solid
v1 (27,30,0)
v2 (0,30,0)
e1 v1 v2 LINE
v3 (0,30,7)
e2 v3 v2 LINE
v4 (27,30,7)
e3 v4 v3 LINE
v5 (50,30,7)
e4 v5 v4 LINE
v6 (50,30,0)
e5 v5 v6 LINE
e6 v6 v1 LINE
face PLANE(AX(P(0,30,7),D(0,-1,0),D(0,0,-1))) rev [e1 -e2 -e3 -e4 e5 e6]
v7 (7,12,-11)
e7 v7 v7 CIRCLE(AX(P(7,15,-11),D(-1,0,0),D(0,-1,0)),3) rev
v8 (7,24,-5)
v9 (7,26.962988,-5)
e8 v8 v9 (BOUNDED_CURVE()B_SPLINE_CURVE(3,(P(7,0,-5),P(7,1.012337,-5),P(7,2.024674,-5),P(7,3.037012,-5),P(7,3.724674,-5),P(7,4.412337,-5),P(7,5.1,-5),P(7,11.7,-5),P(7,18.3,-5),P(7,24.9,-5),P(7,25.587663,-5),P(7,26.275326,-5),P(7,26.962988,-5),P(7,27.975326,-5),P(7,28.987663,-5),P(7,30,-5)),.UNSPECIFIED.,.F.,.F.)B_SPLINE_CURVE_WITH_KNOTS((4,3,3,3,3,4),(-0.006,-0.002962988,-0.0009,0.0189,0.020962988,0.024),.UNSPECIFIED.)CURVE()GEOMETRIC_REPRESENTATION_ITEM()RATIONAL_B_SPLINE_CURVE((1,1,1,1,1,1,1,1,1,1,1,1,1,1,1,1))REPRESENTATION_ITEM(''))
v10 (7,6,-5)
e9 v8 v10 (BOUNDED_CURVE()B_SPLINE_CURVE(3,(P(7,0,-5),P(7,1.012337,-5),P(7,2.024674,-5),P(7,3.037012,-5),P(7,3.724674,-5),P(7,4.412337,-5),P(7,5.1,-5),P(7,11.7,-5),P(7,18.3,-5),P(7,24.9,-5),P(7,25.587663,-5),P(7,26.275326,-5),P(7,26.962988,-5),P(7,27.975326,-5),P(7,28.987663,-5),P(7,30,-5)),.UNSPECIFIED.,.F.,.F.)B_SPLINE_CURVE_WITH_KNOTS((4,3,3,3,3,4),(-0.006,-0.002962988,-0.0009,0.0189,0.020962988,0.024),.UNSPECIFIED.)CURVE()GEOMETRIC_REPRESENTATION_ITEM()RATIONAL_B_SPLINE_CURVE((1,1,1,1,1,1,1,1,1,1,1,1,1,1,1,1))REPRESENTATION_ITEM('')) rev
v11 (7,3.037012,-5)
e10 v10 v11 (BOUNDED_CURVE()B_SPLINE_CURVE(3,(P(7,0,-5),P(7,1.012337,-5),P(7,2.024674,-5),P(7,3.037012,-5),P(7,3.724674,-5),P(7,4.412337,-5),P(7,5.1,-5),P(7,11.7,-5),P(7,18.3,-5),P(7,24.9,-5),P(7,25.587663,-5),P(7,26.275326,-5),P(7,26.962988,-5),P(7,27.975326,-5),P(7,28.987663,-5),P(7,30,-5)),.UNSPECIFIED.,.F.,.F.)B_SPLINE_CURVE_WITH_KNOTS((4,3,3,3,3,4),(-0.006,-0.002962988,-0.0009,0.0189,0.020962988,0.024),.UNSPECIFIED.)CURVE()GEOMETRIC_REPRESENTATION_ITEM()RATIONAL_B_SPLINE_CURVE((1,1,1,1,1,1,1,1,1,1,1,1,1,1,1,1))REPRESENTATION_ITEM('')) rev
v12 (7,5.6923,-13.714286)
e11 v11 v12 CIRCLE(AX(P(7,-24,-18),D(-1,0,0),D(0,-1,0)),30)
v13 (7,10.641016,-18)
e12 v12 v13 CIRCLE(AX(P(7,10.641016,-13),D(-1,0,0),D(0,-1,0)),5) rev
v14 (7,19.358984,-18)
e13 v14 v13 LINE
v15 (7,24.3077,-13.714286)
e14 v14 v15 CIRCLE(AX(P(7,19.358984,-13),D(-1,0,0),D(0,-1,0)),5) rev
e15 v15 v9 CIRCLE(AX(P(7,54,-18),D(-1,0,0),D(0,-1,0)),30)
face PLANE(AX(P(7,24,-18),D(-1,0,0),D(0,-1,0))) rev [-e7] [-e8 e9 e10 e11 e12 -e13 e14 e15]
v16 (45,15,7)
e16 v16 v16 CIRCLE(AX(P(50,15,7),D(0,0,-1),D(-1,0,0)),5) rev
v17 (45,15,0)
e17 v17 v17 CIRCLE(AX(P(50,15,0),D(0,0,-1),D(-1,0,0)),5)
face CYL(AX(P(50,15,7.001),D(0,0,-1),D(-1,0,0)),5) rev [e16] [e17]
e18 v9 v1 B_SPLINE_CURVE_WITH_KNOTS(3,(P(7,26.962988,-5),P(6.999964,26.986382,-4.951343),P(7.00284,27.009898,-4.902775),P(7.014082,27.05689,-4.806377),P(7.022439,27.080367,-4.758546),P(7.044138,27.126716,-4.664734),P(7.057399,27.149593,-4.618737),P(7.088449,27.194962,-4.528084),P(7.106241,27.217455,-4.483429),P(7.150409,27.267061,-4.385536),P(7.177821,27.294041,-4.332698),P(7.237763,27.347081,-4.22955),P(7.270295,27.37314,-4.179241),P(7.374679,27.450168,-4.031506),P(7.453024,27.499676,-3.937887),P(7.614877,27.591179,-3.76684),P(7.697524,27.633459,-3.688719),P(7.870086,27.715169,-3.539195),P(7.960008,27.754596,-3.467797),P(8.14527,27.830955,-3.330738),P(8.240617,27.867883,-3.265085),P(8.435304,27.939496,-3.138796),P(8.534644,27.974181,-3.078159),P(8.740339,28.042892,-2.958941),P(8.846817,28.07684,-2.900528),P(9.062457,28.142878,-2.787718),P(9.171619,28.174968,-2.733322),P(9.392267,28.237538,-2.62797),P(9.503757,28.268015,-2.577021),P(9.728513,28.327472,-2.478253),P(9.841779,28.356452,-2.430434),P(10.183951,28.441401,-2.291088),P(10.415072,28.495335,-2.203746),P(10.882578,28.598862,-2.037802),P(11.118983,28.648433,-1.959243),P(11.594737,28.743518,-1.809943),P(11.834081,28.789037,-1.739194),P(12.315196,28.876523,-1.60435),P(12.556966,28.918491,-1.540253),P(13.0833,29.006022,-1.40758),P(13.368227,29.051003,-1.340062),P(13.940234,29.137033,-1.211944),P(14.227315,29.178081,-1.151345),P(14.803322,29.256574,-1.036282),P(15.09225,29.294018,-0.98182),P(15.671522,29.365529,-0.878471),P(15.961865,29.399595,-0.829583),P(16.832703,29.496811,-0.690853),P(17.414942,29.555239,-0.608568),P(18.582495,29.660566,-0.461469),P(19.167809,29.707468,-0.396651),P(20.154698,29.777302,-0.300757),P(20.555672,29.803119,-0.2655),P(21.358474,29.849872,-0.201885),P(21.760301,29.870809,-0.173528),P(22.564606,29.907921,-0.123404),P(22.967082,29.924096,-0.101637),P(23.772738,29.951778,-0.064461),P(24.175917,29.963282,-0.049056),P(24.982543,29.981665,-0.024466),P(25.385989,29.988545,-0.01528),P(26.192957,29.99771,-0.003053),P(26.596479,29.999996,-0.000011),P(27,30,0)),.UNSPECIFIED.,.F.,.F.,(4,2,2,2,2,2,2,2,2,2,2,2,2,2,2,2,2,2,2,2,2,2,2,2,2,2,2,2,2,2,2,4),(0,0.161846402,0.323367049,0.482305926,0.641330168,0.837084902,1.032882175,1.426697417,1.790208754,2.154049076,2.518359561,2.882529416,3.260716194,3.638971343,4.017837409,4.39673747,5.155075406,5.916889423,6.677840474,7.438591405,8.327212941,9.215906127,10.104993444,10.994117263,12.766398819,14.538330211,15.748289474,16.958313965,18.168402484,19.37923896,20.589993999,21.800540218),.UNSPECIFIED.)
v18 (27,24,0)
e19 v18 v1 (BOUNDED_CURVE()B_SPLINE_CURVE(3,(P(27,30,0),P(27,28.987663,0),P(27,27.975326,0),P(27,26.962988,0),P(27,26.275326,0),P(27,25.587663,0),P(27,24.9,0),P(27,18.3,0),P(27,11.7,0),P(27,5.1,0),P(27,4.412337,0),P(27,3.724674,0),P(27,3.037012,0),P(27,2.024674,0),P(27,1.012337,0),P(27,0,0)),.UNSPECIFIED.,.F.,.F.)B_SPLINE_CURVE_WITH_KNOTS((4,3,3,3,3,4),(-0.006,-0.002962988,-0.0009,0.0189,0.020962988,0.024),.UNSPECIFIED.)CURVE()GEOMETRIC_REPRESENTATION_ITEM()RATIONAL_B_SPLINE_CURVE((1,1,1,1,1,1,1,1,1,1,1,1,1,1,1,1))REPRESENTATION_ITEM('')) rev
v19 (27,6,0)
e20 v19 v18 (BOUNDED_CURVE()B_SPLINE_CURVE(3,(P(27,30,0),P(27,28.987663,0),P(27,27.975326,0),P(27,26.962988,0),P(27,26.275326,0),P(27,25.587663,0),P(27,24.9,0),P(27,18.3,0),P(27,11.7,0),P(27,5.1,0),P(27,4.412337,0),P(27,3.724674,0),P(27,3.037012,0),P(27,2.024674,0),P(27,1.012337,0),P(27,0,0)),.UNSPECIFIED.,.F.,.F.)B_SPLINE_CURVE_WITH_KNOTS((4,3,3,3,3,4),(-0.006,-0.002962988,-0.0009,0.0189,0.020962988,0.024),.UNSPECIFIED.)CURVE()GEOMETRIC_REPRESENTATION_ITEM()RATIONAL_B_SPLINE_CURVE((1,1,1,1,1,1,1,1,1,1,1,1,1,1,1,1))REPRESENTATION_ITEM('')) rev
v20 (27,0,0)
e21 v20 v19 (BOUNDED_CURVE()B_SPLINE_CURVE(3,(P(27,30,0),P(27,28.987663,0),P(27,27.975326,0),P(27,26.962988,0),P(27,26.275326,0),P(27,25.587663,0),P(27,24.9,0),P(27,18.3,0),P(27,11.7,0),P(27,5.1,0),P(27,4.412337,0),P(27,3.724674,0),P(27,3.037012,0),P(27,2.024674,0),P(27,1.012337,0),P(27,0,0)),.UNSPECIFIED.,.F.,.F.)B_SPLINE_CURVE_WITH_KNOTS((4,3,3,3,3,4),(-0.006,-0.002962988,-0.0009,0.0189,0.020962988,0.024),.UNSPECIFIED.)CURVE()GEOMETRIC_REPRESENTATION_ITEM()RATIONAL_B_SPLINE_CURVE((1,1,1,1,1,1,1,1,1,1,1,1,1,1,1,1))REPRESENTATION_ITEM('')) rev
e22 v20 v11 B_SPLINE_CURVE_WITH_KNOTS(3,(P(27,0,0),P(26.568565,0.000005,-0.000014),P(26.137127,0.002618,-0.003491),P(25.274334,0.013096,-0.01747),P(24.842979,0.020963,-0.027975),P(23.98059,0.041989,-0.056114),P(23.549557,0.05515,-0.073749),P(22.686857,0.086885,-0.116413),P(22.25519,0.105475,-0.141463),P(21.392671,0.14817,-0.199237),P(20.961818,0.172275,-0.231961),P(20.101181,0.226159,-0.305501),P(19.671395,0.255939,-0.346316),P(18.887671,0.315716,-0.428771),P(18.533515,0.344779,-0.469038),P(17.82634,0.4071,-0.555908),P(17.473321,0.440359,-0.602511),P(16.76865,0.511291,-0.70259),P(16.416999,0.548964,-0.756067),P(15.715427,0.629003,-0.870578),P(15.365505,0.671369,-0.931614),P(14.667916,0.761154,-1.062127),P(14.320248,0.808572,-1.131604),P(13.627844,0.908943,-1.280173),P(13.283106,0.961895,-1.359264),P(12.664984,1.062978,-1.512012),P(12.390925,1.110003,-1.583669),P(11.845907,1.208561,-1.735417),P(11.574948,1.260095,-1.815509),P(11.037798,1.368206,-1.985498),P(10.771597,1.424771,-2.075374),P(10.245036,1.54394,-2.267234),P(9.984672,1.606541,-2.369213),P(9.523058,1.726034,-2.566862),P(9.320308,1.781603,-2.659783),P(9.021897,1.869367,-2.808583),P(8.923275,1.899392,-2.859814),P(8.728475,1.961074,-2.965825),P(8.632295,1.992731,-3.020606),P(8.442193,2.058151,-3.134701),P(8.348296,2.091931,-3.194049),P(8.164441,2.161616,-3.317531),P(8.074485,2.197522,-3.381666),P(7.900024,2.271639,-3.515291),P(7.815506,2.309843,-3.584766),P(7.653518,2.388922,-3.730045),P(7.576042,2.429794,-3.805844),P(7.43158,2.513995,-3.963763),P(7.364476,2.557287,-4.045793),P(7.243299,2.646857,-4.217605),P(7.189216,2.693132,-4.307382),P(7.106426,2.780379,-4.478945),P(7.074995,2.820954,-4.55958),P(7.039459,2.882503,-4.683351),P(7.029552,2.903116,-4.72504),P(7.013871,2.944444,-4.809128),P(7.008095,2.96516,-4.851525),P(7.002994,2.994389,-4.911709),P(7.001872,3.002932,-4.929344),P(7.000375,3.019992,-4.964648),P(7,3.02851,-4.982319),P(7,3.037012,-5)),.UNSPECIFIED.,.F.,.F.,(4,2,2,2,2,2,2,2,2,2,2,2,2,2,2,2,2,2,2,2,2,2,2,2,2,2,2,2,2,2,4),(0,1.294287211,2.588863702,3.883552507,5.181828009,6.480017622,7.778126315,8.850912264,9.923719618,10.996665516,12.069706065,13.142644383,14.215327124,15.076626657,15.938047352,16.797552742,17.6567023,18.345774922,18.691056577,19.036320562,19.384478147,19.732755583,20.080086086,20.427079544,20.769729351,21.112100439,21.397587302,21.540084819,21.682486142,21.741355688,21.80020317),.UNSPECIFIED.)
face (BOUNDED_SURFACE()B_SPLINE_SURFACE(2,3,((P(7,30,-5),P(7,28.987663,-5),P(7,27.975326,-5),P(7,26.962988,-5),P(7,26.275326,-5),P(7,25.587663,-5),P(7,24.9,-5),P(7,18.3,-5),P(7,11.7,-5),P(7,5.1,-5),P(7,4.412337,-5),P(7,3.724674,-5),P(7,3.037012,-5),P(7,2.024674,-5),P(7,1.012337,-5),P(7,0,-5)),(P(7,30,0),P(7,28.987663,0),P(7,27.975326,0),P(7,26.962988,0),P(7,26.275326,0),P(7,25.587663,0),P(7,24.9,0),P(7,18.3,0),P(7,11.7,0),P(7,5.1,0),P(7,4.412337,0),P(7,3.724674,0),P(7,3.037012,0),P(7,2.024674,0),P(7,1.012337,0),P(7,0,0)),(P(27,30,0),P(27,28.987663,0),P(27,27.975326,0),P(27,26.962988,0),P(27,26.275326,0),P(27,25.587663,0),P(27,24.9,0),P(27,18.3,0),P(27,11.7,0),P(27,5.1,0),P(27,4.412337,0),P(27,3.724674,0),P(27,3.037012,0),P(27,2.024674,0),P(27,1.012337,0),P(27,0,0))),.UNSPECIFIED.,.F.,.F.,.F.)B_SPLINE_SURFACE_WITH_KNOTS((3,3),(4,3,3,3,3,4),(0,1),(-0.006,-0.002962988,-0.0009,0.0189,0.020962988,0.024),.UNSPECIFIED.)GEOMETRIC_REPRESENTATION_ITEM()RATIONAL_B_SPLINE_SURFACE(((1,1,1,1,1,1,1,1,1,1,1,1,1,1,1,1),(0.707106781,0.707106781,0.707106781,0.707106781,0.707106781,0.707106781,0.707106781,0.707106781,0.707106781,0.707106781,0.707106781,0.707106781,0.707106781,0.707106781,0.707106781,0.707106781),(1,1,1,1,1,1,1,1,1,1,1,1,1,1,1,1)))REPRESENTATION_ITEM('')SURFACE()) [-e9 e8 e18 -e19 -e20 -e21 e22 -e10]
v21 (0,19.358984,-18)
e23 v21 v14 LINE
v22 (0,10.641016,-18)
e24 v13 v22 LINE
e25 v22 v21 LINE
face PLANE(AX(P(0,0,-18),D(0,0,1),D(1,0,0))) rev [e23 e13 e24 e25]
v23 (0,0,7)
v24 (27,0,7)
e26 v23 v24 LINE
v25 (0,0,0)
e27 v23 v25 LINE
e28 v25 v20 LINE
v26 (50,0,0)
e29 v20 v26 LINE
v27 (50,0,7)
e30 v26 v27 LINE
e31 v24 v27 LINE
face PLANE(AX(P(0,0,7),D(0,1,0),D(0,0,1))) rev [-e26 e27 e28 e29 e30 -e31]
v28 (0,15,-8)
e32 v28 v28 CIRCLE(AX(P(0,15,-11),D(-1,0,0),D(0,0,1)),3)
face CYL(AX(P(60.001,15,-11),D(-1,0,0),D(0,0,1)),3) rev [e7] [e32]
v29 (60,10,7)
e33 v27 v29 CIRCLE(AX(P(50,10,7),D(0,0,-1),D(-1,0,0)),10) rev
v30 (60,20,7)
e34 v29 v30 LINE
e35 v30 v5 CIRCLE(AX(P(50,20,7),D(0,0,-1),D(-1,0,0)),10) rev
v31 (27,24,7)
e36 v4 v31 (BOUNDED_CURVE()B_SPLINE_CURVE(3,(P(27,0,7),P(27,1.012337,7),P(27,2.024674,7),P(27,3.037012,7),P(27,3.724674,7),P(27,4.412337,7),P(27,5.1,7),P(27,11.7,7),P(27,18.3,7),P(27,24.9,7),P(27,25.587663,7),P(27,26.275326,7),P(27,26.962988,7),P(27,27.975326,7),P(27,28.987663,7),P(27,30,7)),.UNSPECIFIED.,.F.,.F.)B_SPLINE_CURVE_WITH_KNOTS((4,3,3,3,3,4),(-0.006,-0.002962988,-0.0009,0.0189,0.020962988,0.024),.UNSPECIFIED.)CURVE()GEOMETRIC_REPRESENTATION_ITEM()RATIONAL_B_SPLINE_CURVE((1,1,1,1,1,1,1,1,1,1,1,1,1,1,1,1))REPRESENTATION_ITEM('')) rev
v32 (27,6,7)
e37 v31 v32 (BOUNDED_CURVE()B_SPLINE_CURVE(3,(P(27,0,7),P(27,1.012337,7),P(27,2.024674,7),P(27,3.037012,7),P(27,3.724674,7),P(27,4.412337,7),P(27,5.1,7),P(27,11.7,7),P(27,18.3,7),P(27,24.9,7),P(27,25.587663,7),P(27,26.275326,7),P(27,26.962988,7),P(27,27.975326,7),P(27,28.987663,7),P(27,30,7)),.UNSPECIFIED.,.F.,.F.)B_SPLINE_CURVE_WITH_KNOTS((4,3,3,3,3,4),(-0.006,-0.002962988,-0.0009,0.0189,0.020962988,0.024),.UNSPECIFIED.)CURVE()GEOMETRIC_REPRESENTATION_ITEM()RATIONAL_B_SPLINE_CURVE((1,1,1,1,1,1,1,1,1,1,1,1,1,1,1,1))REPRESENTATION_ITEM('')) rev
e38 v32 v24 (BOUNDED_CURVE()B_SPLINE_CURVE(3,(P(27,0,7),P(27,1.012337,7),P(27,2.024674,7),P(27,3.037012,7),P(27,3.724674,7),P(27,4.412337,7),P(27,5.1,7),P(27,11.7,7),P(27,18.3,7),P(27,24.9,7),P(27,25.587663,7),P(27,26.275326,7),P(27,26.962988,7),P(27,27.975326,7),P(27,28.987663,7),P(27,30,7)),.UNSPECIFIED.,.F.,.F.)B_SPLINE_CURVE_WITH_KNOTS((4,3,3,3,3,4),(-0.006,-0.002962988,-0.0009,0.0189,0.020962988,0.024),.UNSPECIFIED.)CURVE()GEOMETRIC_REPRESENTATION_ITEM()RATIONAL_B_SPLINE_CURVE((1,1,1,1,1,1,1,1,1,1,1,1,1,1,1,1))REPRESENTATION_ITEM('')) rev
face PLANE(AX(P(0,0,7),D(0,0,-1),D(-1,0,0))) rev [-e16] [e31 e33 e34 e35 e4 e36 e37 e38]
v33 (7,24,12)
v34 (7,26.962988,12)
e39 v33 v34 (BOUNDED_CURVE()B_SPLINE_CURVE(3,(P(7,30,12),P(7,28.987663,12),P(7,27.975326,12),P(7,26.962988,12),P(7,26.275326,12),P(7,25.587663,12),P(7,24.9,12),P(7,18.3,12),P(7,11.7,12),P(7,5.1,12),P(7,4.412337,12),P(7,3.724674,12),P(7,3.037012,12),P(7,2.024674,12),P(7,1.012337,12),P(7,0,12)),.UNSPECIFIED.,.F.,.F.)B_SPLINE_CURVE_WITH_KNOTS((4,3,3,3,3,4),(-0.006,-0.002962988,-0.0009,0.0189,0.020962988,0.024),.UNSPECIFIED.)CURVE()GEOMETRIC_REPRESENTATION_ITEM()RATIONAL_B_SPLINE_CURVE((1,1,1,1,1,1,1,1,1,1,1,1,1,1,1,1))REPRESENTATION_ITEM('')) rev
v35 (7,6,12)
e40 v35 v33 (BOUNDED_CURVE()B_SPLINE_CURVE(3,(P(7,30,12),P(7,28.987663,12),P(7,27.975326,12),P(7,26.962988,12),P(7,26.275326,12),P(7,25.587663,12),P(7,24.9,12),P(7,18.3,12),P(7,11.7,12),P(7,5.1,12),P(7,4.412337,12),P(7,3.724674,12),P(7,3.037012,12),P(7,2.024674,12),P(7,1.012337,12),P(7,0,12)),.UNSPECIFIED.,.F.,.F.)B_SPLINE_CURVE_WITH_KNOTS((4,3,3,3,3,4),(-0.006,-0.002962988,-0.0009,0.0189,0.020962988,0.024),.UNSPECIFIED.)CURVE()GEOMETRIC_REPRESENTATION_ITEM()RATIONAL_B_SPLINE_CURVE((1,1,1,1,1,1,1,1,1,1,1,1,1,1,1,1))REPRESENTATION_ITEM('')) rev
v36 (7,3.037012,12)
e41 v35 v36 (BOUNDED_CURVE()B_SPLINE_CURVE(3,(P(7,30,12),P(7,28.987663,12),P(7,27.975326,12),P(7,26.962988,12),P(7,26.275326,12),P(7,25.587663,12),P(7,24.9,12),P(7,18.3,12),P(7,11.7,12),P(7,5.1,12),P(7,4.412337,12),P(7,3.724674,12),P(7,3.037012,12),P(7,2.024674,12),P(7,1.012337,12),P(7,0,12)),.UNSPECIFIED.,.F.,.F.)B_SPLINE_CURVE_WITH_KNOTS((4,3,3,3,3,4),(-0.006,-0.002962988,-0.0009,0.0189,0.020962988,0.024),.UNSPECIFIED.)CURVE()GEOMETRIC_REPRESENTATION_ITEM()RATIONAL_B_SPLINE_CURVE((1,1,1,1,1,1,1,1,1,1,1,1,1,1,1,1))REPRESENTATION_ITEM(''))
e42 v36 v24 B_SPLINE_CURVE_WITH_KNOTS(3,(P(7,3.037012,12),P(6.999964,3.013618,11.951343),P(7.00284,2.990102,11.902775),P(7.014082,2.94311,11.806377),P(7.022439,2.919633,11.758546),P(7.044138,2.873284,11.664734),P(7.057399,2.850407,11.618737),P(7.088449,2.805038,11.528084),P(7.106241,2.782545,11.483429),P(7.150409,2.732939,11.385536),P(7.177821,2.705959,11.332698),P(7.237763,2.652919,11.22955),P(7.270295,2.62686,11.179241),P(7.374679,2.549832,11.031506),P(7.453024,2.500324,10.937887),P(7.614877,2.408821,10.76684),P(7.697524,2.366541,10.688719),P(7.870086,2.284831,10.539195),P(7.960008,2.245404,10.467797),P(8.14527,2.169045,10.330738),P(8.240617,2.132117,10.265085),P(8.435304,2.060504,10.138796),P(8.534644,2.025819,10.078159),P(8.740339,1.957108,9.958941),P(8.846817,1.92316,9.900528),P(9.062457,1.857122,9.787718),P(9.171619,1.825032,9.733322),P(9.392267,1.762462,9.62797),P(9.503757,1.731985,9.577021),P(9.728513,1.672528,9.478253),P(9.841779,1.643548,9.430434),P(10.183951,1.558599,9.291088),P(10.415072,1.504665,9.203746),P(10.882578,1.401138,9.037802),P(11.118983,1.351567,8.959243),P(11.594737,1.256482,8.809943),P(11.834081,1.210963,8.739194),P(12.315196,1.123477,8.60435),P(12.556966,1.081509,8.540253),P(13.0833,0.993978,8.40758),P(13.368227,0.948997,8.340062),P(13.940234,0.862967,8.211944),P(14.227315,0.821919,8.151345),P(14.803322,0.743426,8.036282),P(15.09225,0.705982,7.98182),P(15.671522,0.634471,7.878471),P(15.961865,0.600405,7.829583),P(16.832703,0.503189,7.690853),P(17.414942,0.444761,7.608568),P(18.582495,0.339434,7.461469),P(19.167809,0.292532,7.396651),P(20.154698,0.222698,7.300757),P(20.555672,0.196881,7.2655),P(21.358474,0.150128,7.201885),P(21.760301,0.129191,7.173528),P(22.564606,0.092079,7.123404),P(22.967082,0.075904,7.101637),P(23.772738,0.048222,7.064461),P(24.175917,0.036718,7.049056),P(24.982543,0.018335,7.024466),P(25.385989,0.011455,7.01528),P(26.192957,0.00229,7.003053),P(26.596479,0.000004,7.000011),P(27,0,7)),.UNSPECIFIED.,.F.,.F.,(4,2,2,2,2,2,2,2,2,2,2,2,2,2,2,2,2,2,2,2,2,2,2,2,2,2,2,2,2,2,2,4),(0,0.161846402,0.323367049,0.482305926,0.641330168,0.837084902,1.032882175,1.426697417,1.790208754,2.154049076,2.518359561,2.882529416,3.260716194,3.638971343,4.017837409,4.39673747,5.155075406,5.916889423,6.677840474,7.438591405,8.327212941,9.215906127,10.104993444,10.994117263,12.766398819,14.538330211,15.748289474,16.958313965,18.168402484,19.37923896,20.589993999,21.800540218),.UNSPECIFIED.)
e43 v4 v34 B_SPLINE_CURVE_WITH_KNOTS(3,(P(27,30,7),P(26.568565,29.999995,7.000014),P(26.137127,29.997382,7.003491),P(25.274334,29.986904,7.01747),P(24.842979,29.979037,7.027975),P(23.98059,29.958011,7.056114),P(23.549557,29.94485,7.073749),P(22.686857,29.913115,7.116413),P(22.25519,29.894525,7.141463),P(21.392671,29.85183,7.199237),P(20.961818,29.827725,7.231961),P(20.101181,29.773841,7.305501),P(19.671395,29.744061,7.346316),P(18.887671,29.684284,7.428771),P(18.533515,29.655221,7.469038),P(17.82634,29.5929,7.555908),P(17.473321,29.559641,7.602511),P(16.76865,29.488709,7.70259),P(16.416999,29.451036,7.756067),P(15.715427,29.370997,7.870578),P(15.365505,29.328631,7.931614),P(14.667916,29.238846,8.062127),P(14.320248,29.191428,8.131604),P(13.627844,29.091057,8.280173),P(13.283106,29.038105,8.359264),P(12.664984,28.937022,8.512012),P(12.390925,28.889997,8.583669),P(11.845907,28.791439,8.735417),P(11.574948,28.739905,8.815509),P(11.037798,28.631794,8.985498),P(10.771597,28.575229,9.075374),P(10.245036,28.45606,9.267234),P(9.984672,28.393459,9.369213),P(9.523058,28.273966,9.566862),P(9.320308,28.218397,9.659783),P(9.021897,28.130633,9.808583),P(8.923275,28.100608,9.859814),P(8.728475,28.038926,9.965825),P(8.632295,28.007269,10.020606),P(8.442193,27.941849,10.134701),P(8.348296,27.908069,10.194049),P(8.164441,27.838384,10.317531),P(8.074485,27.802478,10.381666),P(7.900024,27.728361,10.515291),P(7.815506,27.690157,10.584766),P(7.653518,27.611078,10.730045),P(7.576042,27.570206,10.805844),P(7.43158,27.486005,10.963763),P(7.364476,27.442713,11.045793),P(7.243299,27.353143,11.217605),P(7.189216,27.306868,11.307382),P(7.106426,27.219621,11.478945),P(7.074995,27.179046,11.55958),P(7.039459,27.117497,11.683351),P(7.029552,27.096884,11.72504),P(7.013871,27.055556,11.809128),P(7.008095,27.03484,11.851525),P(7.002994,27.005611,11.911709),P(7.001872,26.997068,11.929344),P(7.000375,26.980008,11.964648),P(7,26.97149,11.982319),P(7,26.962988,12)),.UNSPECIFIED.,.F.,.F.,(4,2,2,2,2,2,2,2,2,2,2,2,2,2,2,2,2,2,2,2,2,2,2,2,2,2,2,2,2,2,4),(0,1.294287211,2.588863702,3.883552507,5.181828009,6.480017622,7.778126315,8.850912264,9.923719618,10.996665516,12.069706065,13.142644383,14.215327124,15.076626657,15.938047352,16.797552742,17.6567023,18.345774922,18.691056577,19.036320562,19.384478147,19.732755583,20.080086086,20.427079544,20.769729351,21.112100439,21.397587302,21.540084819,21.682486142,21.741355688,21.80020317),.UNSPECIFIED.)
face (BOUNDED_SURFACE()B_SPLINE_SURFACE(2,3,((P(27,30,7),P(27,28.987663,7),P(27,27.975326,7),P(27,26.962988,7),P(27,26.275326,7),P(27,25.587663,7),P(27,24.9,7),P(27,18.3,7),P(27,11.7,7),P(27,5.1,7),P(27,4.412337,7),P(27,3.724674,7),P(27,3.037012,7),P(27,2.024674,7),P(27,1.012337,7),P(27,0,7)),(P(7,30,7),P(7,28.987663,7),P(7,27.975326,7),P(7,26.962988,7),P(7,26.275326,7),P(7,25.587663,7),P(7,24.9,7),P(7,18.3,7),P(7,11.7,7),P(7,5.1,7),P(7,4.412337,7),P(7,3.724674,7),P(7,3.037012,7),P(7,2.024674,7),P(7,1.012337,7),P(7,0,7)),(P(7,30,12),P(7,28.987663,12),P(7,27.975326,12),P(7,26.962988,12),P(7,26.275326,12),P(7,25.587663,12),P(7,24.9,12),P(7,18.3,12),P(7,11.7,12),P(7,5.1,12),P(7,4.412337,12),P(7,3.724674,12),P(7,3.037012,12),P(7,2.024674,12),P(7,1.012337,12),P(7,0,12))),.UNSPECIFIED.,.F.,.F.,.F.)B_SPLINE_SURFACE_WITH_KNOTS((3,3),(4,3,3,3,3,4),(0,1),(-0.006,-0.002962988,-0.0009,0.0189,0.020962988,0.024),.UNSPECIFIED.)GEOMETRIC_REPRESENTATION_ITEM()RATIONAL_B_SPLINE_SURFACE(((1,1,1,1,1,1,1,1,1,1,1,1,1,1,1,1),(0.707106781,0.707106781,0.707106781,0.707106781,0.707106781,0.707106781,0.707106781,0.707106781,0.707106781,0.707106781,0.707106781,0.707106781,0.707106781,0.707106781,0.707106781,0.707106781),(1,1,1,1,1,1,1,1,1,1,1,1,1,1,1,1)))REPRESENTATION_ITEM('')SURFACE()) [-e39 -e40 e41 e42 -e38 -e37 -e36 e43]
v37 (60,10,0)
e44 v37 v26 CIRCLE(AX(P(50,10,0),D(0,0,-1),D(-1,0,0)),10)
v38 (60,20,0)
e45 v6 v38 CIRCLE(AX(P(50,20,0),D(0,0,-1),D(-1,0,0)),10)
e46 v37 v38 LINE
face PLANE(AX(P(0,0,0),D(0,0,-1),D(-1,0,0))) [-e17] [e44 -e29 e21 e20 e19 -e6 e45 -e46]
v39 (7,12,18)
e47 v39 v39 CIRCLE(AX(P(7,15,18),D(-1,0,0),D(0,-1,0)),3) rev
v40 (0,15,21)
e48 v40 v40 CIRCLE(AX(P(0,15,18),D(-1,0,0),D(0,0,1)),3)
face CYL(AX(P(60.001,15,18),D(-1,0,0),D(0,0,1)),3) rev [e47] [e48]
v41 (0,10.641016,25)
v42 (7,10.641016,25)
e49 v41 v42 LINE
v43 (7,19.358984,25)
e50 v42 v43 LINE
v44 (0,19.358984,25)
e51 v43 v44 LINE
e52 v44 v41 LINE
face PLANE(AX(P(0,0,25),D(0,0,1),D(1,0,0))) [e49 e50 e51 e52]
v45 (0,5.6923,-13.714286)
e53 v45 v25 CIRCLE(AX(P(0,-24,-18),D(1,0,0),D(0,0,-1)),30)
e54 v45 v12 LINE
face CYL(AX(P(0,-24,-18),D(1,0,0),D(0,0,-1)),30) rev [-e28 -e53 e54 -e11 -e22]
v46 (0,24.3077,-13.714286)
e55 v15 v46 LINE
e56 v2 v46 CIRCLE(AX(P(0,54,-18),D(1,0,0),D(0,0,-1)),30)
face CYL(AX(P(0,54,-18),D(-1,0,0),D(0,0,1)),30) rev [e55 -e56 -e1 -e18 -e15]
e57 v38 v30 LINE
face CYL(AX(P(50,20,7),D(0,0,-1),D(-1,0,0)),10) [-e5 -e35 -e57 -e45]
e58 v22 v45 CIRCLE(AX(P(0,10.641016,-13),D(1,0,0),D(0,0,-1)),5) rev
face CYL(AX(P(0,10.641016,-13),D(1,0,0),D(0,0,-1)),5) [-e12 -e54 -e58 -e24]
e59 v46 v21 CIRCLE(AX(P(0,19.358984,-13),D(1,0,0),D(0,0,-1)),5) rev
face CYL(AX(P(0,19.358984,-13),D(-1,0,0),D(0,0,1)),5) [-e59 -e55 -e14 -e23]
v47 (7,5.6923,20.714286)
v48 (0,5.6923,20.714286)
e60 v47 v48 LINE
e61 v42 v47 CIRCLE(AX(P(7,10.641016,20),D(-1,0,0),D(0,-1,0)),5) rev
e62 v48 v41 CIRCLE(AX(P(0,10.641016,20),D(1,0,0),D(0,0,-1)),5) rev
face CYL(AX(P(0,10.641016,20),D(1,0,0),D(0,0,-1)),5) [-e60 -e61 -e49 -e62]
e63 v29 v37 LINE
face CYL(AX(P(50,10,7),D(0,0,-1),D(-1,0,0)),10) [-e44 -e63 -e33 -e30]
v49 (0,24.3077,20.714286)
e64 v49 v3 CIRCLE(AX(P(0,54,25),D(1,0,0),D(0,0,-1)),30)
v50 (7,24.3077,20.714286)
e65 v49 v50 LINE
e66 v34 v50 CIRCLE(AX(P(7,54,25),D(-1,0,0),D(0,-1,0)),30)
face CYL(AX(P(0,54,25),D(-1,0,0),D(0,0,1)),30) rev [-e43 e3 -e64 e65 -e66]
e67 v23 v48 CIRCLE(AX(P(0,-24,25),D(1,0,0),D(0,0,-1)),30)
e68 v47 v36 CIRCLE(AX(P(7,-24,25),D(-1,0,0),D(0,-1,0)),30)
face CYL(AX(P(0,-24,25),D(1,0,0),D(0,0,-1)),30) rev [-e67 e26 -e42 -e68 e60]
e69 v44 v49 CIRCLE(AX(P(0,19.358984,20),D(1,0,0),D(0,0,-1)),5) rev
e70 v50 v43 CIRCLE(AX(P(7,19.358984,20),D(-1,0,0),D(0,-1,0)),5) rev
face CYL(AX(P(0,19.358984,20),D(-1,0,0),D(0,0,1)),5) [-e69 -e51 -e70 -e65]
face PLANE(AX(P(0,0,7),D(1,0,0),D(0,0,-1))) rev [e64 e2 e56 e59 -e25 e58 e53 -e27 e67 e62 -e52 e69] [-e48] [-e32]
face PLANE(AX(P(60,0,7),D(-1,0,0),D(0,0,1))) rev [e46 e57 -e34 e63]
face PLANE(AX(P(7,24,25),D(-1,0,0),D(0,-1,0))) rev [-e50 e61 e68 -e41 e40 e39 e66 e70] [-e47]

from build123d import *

# Parameters (mm, degrees)
SKETCH_1_W          = 60
SKETCH_1_H          = 30
EXTRUDE_1_DEPTH     = 7
CUT_EXTRUDE_1_REACH = 69.446
SKETCH_2_R          = 5
SKETCH_3_W          = 7
SKETCH_3_H          = 18
EXTRUDE_2_DEPTH     = 18
SKETCH_4_W          = 7
SKETCH_4_H          = 18
EXTRUDE_3_DEPTH     = 18
CUT_EXTRUDE_2_REACH = 73.589
SKETCH_5_R          = 3
FILLET_2_SIZE       = 20
FILLET_2_SIZE_2     = 5
FILLET_3_DEPTH      = 27.0000001
FILLET_START        = -1
FILLET_3_2_DEPTH    = 32
FILLET_4_R          = 5
FILLET_5_R          = 5
FILLET_6_R          = 5
FILLET_7_R          = 5
FILLET_8_R          = 10


with BuildPart() as part:
    # 草图1 → 凸台-拉伸1 (new body)
    with BuildSketch(Plane.XY):
        with Locations((30, 15)):
            Rectangle(SKETCH_1_W, SKETCH_1_H)
    extrude(amount=EXTRUDE_1_DEPTH)

    # 草图2 → 切除-拉伸1 (cut, up to next)
    with BuildSketch(Plane(origin=(0, 0, 0), x_dir=(-1, 0, 0), z_dir=(0, 0, -1)), mode=Mode.PRIVATE) as cut_extrude_1_sk1:
        with Locations((-50, 15)):
            Circle(SKETCH_2_R)
    cut_extrude_1_tool1 = extrude(cut_extrude_1_sk1.sketch, amount=-CUT_EXTRUDE_1_REACH, mode=Mode.PRIVATE) & part.part
    add(cut_extrude_1_tool1.solids().sort_by_distance((50, 15, 0))[0], mode=Mode.SUBTRACT)

    # 草图3 → 凸台-拉伸2 (add)
    with BuildSketch(Plane.XY.offset(7)):
        with Locations((3.5, 15)):
            Rectangle(SKETCH_3_W, SKETCH_3_H)
    extrude(amount=EXTRUDE_2_DEPTH)

    # 草图4 → 凸台-拉伸3 (add)
    with BuildSketch(Plane(origin=(0, 0, 0), x_dir=(-1, 0, 0), z_dir=(0, 0, -1))):
        with Locations((-3.5, 15)):
            Rectangle(SKETCH_4_W, SKETCH_4_H)
    extrude(amount=EXTRUDE_3_DEPTH)

    # 草图5 → 切除-拉伸2 (cut, up to next)
    with BuildSketch(Plane.ZY, mode=Mode.PRIVATE) as cut_extrude_2_sk1:
        with Locations((-11, 15)):
            Circle(SKETCH_5_R)
    cut_extrude_2_tool1 = extrude(cut_extrude_2_sk1.sketch, amount=-CUT_EXTRUDE_2_REACH, mode=Mode.PRIVATE) & part.part
    # 草图5 → 切除-拉伸2 (cut, up to next)
    with BuildSketch(Plane.ZY, mode=Mode.PRIVATE) as cut_extrude_2_sk2:
        with Locations((18, 15)):
            Circle(SKETCH_5_R)
    cut_extrude_2_tool2 = extrude(cut_extrude_2_sk2.sketch, amount=-CUT_EXTRUDE_2_REACH, mode=Mode.PRIVATE) & part.part
    add(cut_extrude_2_tool1.solids().sort_by_distance((0, 15, -11))[0], mode=Mode.SUBTRACT)
    add(cut_extrude_2_tool2.solids().sort_by_distance((0, 15, 18))[0], mode=Mode.SUBTRACT)

    # 圆角2
    # a fillet whose section is not a circle: 20, 5 mm, written as the material it adds along each edge
    with BuildSketch(Plane(origin=(7, 24, 7), x_dir=(1, 0, 0), z_dir=(0, -1, 0))) as fillet_2_piece_1:
        with BuildLine():
            Bezier((FILLET_2_SIZE, 0), (0, 0), (0, FILLET_2_SIZE_2), weights=[1, 0.707106781, 1])
            Line((0, FILLET_2_SIZE_2), (0, 0))
            Line((0, 0), (FILLET_2_SIZE, 0))
        make_face()
    extrude(amount=18)
    with BuildSketch(Plane(origin=(7, 24, 0), x_dir=(1, 0, 0), z_dir=(0, -1, 0))) as fillet_2_piece_2:
        with BuildLine():
            Bezier((FILLET_2_SIZE, 0), (0, 0), (0, -FILLET_2_SIZE_2), weights=[1, 0.707106781, 1])
            Line((0, -FILLET_2_SIZE_2), (0, 0))
            Line((0, 0), (FILLET_2_SIZE, 0))
        make_face()
    extrude(amount=18)

    # 圆角3: read off the stored shape, not the designer's step
    # 圆角3 outline → 圆角3 (add)
    with BuildSketch(Plane.YZ):
        with BuildLine():
            Line((24, 25), (24, 7))
            Line((24, 7), (30, 7))
            ThreePointArc((30, 7), (25.539501058, 15.513167019), (24, 25))
        make_face()
        with BuildLine():
            ThreePointArc((6, 25), (4.460498942, 15.513167019), (0, 7))
            Line((0, 7), (6, 7))
            Line((6, 7), (6, 25))
        make_face()
        with BuildLine():
            Line((24, 0), (24, -18))
            ThreePointArc((24, -18), (25.539501058, -8.513167019), (30, 0))
            Line((30, 0), (24, 0))
        make_face()
        with BuildLine():
            Line((6, -18), (6, 0))
            Line((6, 0), (0, 0))
            ThreePointArc((0, 0), (4.460498942, -8.513167019), (6, -18))
        make_face()
    extrude(amount=FILLET_3_DEPTH)

    # Fillet 3 2 outline → Fillet 3 2 (cut)
    with BuildSketch(Plane(origin=(0, 0, 0), x_dir=(1, 0, 0), z_dir=(0, 1, 0)).offset(FILLET_START)):
        with BuildLine():
            add(Edge.make_bspline(
                [(7, -12), (7, -7), (27, -7)],
                knots=[0, 0, 0, 1, 1, 1], degree=2, weights=[1, 0.707106781, 1]))
            Line((7, -12), (7, -25))
            Line((7, -25), (27.0000001, -25))
            Line((27.0000001, -25), (27, -7))
        make_face()
        with BuildLine():
            Line((27.0000001, 18), (7, 18))
            Line((7, 18), (7, 5))
            add(Edge.make_bspline(
                [(27, 0), (7, 0), (7, 5)],
                knots=[0, 0, 0, 1, 1, 1], degree=2, weights=[1, 0.707106781, 1]))
            Line((27, 0), (27.0000001, 18))
        make_face()
    extrude(amount=FILLET_3_2_DEPTH, mode=Mode.SUBTRACT)

    # 圆角4
    fillet_4_edges = [part.edges().sort_by_distance(p)[0] for p in [
        (3.5, 24, 25),
    ]]
    fillet(fillet_4_edges, radius=FILLET_4_R)

    # 圆角5
    fillet_5_edges = [part.edges().sort_by_distance(p)[0] for p in [
        (3.5, 6, 25),
    ]]
    fillet(fillet_5_edges, radius=FILLET_5_R)

    # 圆角6
    fillet_6_edges = [part.edges().sort_by_distance(p)[0] for p in [
        (3.5, 6, -18),
    ]]
    fillet(fillet_6_edges, radius=FILLET_6_R)

    # 圆角7
    fillet_7_edges = [part.edges().sort_by_distance(p)[0] for p in [
        (3.5, 24, -18),
    ]]
    fillet(fillet_7_edges, radius=FILLET_7_R)

    # 圆角8
    fillet_8_edges = [part.edges().sort_by_distance(p)[0] for p in [
        (60, 0, 3.5),
        (60, 30, 3.5),
    ]]
    fillet(fillet_8_edges, radius=FILLET_8_R)


solid = part.part
